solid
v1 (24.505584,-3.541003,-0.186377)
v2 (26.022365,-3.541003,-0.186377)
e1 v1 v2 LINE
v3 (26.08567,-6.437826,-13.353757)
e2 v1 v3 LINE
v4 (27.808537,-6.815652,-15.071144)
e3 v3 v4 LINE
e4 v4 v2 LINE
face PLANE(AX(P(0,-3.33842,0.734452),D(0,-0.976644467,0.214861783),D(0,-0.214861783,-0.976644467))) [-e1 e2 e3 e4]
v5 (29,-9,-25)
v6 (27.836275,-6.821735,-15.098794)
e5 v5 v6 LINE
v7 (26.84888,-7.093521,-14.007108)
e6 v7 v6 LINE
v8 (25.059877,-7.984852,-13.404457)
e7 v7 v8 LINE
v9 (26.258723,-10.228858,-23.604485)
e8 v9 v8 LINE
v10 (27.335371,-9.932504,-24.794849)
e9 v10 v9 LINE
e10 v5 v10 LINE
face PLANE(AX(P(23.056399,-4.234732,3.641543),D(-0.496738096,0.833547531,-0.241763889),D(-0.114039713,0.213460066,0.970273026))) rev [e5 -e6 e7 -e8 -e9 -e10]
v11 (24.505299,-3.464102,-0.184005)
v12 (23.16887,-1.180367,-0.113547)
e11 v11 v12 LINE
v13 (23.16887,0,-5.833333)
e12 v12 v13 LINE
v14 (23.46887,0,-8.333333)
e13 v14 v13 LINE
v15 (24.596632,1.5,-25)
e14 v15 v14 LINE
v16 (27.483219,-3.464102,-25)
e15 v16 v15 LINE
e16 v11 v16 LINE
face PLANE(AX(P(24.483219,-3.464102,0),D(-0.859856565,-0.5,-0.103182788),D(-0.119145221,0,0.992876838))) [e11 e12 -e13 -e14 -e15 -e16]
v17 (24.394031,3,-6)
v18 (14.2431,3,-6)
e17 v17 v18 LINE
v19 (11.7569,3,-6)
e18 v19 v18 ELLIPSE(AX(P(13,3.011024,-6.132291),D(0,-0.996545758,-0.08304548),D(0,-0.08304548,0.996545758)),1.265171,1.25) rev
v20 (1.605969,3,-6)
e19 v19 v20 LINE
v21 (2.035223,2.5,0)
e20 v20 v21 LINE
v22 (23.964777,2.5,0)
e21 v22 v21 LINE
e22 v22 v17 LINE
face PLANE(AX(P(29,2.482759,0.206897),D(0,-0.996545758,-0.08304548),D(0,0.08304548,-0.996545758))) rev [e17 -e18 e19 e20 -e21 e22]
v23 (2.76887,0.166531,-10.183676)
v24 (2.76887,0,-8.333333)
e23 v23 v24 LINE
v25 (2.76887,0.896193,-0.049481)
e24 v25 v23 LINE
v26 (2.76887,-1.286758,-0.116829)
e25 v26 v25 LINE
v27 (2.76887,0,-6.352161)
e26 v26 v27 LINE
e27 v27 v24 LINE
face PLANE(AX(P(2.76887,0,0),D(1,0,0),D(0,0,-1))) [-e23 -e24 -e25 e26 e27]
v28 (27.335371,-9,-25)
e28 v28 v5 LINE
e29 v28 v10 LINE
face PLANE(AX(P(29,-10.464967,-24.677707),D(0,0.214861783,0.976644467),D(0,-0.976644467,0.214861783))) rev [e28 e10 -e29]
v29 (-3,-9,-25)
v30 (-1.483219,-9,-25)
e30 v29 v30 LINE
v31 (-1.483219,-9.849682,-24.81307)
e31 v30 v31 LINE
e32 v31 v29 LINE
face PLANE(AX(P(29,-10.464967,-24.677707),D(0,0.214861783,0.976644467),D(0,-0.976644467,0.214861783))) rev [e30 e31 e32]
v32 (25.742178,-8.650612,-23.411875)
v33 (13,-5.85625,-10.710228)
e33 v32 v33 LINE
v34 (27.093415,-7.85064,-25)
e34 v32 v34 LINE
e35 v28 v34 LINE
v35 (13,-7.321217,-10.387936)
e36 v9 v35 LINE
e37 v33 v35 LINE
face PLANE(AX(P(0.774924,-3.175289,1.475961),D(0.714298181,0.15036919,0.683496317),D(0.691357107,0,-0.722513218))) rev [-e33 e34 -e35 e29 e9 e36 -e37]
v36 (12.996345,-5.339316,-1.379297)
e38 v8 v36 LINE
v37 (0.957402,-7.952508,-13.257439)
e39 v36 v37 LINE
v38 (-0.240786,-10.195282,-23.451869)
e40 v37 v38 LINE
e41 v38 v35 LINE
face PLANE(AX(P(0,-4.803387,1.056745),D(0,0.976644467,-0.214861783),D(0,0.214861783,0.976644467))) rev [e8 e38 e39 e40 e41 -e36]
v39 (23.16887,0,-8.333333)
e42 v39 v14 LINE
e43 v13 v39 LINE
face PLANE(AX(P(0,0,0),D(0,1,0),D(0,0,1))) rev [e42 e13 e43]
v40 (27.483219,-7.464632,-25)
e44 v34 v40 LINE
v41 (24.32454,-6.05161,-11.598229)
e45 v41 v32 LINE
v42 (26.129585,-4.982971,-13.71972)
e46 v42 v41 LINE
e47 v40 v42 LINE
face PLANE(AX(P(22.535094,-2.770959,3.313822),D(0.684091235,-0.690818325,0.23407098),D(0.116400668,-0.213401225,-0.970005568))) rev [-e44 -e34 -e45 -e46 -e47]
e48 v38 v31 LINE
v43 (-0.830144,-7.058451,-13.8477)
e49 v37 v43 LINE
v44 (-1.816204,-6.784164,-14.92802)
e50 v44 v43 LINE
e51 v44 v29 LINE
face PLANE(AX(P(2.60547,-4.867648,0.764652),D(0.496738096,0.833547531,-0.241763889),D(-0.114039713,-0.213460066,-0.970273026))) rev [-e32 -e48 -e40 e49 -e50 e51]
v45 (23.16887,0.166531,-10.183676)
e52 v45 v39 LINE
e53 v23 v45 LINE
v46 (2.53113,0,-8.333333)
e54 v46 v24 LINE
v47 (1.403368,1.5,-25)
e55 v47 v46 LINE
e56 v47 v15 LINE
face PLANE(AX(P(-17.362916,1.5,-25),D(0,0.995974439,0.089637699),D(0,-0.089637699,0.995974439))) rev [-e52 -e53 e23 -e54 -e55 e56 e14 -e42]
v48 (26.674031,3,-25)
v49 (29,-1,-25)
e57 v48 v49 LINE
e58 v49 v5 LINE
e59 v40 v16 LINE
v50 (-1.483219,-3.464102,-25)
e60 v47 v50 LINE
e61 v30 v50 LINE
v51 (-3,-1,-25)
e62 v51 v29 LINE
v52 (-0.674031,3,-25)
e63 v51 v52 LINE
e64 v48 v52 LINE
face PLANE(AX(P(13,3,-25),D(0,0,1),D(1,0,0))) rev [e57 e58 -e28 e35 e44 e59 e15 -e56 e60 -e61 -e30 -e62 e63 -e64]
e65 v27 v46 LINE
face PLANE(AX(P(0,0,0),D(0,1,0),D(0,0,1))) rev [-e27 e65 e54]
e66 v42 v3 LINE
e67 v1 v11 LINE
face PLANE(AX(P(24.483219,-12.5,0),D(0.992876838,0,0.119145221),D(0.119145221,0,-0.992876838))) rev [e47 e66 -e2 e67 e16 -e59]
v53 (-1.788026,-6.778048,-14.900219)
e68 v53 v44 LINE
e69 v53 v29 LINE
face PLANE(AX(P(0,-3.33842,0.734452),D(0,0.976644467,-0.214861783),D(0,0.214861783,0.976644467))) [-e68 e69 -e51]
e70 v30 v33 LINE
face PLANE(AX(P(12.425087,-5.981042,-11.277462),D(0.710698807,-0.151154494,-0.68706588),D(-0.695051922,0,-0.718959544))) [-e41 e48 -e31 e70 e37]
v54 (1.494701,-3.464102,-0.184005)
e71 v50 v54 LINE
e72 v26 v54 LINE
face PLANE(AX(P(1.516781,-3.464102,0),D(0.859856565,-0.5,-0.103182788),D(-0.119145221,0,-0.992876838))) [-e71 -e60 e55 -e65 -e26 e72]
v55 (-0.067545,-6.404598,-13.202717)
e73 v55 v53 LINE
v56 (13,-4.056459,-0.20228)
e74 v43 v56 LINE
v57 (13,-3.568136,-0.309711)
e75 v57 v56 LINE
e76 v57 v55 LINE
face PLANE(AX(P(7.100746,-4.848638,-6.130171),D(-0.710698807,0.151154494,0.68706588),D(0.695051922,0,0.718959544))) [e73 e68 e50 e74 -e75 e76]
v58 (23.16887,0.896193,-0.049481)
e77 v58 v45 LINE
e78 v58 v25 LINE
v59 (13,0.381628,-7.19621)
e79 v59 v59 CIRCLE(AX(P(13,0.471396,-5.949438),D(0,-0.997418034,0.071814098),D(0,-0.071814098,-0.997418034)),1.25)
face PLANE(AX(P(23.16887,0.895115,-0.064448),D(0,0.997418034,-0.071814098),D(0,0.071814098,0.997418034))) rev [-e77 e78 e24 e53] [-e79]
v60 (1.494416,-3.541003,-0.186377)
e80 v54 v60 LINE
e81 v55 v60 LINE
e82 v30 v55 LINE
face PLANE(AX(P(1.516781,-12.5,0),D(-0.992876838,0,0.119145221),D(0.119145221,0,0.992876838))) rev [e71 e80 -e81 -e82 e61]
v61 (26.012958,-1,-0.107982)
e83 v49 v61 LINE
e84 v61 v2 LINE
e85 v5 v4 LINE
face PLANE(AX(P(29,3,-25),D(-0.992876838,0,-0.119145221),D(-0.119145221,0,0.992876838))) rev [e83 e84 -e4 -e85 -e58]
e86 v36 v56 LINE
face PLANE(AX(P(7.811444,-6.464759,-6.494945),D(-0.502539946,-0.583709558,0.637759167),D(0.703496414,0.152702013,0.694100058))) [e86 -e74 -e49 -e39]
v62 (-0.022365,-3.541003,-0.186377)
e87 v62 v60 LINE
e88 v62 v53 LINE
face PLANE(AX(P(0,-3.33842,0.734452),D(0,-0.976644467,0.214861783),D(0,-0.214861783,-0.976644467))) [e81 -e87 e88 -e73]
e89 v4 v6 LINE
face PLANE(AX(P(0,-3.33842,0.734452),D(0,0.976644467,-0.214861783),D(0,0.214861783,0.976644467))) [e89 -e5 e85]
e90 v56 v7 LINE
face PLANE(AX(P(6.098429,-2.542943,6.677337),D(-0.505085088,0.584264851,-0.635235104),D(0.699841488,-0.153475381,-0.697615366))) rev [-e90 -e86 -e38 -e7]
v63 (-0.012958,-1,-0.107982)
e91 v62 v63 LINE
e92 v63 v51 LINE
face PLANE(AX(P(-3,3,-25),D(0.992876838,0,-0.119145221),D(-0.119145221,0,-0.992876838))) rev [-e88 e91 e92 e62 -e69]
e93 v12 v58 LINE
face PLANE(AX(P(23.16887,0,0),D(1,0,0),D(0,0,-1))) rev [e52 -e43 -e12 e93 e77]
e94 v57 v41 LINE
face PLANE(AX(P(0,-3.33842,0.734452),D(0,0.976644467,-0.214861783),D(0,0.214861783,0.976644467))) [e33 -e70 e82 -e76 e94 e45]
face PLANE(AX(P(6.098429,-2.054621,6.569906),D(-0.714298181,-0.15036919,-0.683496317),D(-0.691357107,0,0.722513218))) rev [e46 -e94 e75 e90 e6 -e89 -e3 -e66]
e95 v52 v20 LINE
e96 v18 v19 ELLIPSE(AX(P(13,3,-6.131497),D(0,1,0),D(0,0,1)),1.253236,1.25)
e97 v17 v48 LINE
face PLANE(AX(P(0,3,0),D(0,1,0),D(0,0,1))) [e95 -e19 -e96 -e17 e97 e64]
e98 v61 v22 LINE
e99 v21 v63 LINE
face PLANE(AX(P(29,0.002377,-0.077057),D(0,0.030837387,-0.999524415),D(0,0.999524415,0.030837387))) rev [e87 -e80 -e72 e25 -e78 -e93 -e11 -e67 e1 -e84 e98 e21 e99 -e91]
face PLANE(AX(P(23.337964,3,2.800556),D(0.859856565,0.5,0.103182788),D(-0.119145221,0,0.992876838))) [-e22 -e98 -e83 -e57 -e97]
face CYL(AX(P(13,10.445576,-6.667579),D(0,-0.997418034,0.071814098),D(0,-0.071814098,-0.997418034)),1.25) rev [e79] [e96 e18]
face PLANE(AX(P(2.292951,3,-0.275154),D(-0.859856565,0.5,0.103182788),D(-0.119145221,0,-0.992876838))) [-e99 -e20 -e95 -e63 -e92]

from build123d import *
from OCP.BRepFilletAPI import BRepFilletAPI_MakeChamfer

# Parameters (mm, degrees)
EXTRUDE_3_DEPTH                  = 3
EXTRUDE_4_DEPTH                  = 12.5
CHAMFER_3_SIZE                   = 2
CHAMFER_3_SIZE2                  = 3.464101615
CHAMFER_4_SIZE                   = 4
CHAMFER_4_SIZE2                  = 2.309401077
CUT_EXTRUDE_2_DEPTH              = 41.277164746
CUT_EXTRUDE_2_DEPTH_BACK         = 41.277164746
EXTRUDE_5_DEPTH                  = 1.5
CUT_EXTRUDE_5_DEPTH              = 1.5
CHAMFER_7_SIZE                   = 1.5
CHAMFER_7_SIZE_2                 = 1.539926414
CHAMFER_8_SIZE                   = 2.598076211
CHAMFER_8_SIZE_2                 = 1.5
CHAMFER_10_SIZE                  = 1
CUT_EXTRUDE_START                = 2.76887
CUT_EXTRUDE_13_DEPTH             = 20.4
SKETCH_16_R                      = 1.25
CUT_EXTRUDE_14_DEPTH             = 10
CUT_EXTRUDE_15_REACH             = 54.631
CUT_EXTRUDE_START_2              = 13
CUT_EXTRUDE_15_DIRECTION_2_REACH = 54.631
CUT_EXTRUDE_START_3              = -5
CUT_EXTRUDE_16_DEPTH             = 45.631175115


# Some blends are built 0.0001 mm under size
with BuildPart() as part:
    # Эскиз5 → Бобышка-Вытянуть3 (new body)
    with BuildSketch(Plane(origin=(0, 0, 0), x_dir=(1, 0, 0), z_dir=(0, 1, 0))):
        Polygon((0, 0), (26, 0), (29, 25), (13, 25), (-3, 25), align=None)
    extrude(amount=EXTRUDE_3_DEPTH)

    # Эскиз6 → Бобышка-Вытянуть4 (add)
    with BuildSketch(Plane(origin=(0, 0, 0), x_dir=(-1, 0, 0), z_dir=(0, -1, 0))):
        Polygon((0, 0), (3, 25), (1.483218869, 25), (-1.516781131, 0), align=None)
        Polygon((-27.483218869, 25), (-29, 25), (-26, 0), (-24.483218869, 0), align=None)
    extrude(amount=EXTRUDE_4_DEPTH)

    # Фаска3
    chamfer_3_edges = [part.edges().sort_by_distance(p)[0] for p in [
        (0.016781131, 0, -12.5),
        (25.983218869, 0, -12.5),
    ]]
    chamfer_3_side = [part.faces().sort_by_distance(p)[0] for p in [
        (13, 0, -12.981390637),
    ]]
    chamfer(chamfer_3_edges, length=CHAMFER_3_SIZE, length2=CHAMFER_3_SIZE2, reference=chamfer_3_side[0])

    # Фаска4: one chamfer whose edges measure the first distance from different faces: ONE call of the kernel's chamfer builder (chamfer() names one face for all edges)
    chamfer_4_edges_1 = [part.edges().sort_by_distance(p)[0] for p in [
        (27.5, 3, -12.5),
    ]]
    chamfer_4_side_1 = [part.faces().sort_by_distance(p)[0] for p in [
        (27.5, -4.75, -12.5),
    ]]
    chamfer_4_edges_2 = [part.edges().sort_by_distance(p)[0] for p in [
        (-1.5, 3, -12.5),
    ]]
    chamfer_4_side_2 = [part.faces().sort_by_distance(p)[0] for p in [
        (-1.5, -4.75, -12.5),
    ]]
    chamfer_4 = BRepFilletAPI_MakeChamfer(part.part.solid().wrapped)
    for e in chamfer_4_edges_1:
        chamfer_4.Add(CHAMFER_4_SIZE, CHAMFER_4_SIZE2, e.wrapped, chamfer_4_side_1[0].wrapped)  # the first distance lies on this face
    for e in chamfer_4_edges_2:
        chamfer_4.Add(CHAMFER_4_SIZE, CHAMFER_4_SIZE2, e.wrapped, chamfer_4_side_2[0].wrapped)  # the first distance lies on this face
    add(Compound.cast(chamfer_4.Shape()), mode=Mode.REPLACE)

    # Эскиз7 → Вырез-Вытянуть2 (cut, two sides: drawn at the far end of the back side and taken through both)
    with BuildSketch(Plane(origin=(0, 0, 0), x_dir=(0, 0, -1), z_dir=(1, 0, 0)).offset(-CUT_EXTRUDE_2_DEPTH_BACK)):
        Polygon((25, -14), (25, -9), (0, -3.5), (0, -11), (0, -14), align=None)
    extrude(amount=CUT_EXTRUDE_2_DEPTH + CUT_EXTRUDE_2_DEPTH_BACK, mode=Mode.SUBTRACT)

    # Эскиз8 → Бобышка-Вытянуть5 (add)
    with BuildSketch(Plane(origin=(0, -3.33842045, 0.734452499), x_dir=(-1, 0, 0), z_dir=(0, -0.97664446670509, 0.2148617826751198))):
        Polygon((-29, 26.349867712), (3, 26.349867712), (0, 0.214861783), (-26, 0.214861783), align=None)
    extrude(amount=EXTRUDE_5_DEPTH)

    # Эскиз12 → Вырез-Вытянуть5 (cut)
    with BuildSketch(Plane(origin=(0, -4.80338715, 1.056745173), x_dir=(-1, 0, 0), z_dir=(0, -0.9766444667050901, 0.21486178267511977))):
        Polygon((-27.335370868, 26.349867712), (-13, 11.718369714), (1.483218869, 26.349867712), align=None)
        Polygon((-26, 0.214861783), (-13, 0.214861783), (-13, 1.069133834), (-27.836275269, 16.211883463), (-27.726463854, 15.255242802), align=None)
        Polygon((-13, 1.069133834), (-13, 0.214861783), (0, 0.214861783), (1.726463854, 15.255242802), (1.81620359, 16.037025649), align=None)
    extrude(amount=-CUT_EXTRUDE_5_DEPTH, mode=Mode.SUBTRACT)

    # Фаска7
    # the kernel refuses this chamfer: 1.539926414, 1.5 mm, written as the material it adds along each edge
    with BuildSketch(Plane(origin=(25.624388162, -5.592143703, -9.509744106), x_dir=(0.053421240321816, 0.9765759265760705, -0.20843615500811763), z_dir=(0.11640066814175269, -0.21340122492654667, -0.9700055678479392))) as chamfer_7_piece_1_section:
        Polygon((CHAMFER_7_SIZE * 0.99960211638, -CHAMFER_7_SIZE * 0.0282065405255), (-CHAMFER_7_SIZE_2 * 0.0537868652542, -CHAMFER_7_SIZE_2 * 0.998552439015), (0, 0), align=None)
    chamfer_7_piece_1 = extrude(amount=19.932121115, mode=Mode.PRIVATE)
    chamfer_7_piece_1 = split(chamfer_7_piece_1, bisect_by=Plane(origin=(26.215798587, -7.11837448, -25), z_dir=(0, 0, 1)), keep=Keep.TOP, mode=Mode.PRIVATE)
    chamfer_7_piece_1 = split(chamfer_7_piece_1, bisect_by=Plane(origin=(28.863675649, -6.560961429, -16.229864216), z_dir=(-0.7142981809435934, -0.1503691897591953, -0.6834963170872516)), keep=Keep.TOP, mode=Mode.PRIVATE)
    chamfer_7_piece_1 = split(chamfer_7_piece_1, bisect_by=Plane(origin=(23.540170532, -7.681629481, -21.323809907), z_dir=(0.7142981809435934, 0.15036918975919533, 0.6834963170872517)), keep=Keep.TOP, mode=Mode.PRIVATE)
    add(chamfer_7_piece_1)

    # Фаска8
    chamfer_8_edges_1 = [part.edges().sort_by_distance(p)[0] for p in [
        (-2.408101795, -9.357048885, -19.641717258),
    ]]
    chamfer_8_side_1 = [part.faces().sort_by_distance(p)[0] for p in [
        (-2.378297509, -9.357783968, -19.645058546),
    ]]
    chamfer_8_edges_2 = [part.edges().sort_by_distance(p)[0] for p in [
        (28.418137634, -9.375834016, -19.727104216),
    ]]
    chamfer_8_side_2 = [part.faces().sort_by_distance(p)[0] for p in [
        (28.388333349, -9.376569099, -19.730445503),
    ]]
    chamfer_8 = BRepFilletAPI_MakeChamfer(part.part.solid().wrapped)
    for e in chamfer_8_edges_1:
        chamfer_8.Add(CHAMFER_8_SIZE - 0.0001, CHAMFER_8_SIZE_2 - 0.0001, e.wrapped, chamfer_8_side_1[0].wrapped)
    for e in chamfer_8_edges_2:
        chamfer_8.Add(CHAMFER_8_SIZE - 0.0001, CHAMFER_8_SIZE_2 - 0.0001, e.wrapped, chamfer_8_side_2[0].wrapped)
    add(Compound.cast(chamfer_8.Shape()), mode=Mode.REPLACE)  # a hair under: the kernel refuses the full size

    # Фаска10
    chamfer_10_edges = [part.edges().sort_by_distance(p)[0] for p in [
        (7.070930475, -6.320076094, -5.837295478),
        (18.937101702, -6.335110761, -5.905634875),
    ]]
    chamfer(chamfer_10_edges, length=CHAMFER_10_SIZE)

    # Эскиз15 → Вырез-Вытянуть13 (cut)
    with BuildSketch(Plane(origin=(0, 0, 0), x_dir=(0, 0, -1), z_dir=(1, 0, 0)).offset(CUT_EXTRUDE_START)):
        Polygon((-0.003394727, -2.1), (12.496605273, -2.1), (12.496605273, 0), (-0.003394727, 0.9), align=None)
    extrude(amount=CUT_EXTRUDE_13_DEPTH, mode=Mode.SUBTRACT)

    # Эскиз16 → Вырез-Вытянуть14 (cut)
    with BuildSketch(Plane(origin=(0, 0.891145714, -0.119581473), x_dir=(-1, 0, 0), z_dir=(0, -0.9974180343569141, 0.0718140984736978))):
        with Locations(Location((-13, 5.84494773, 0), (0, 0, 90))):
            Circle(SKETCH_16_R)
    extrude(amount=-CUT_EXTRUDE_14_DEPTH, mode=Mode.SUBTRACT)

    # Вырез-Вытянуть15: up to this plane
    cut_extrude_15_end = Plane(origin=(1.516781131, -3.464101615, 0), z_dir=(0.8598565649588564, -0.4999999999999951, -0.10318278779506272))
    # Эскиз17 → Вырез-Вытянуть15 (cut, up to the surface)
    with BuildSketch(Plane(origin=(0, 0, 0), x_dir=(0, 0, -1), z_dir=(1, 0, 0)).offset(CUT_EXTRUDE_START_2), mode=Mode.PRIVATE) as cut_extrude_15_sk1:
        Polygon((25, 1.5), (8.333333333, 0), (8.333333333, -2.621768853), (25, -2.621768853), align=None)
    cut_extrude_15_tool1 = split(extrude(cut_extrude_15_sk1.sketch, amount=-CUT_EXTRUDE_15_REACH, mode=Mode.PRIVATE), bisect_by=cut_extrude_15_end, keep=Keep.BOTH, mode=Mode.PRIVATE)
    add(cut_extrude_15_tool1.solids().sort_by_distance((13, -0.90808, -17.284542))[0], mode=Mode.SUBTRACT)

    # Вырез-Вытянуть15 direction 2: up to this plane
    cut_extrude_15_direction_2_end = Plane(origin=(24.483218869, -3.464101615, 0), z_dir=(-0.859856564958857, -0.49999999999999406, -0.10318278779506279))
    # Эскиз17 → Вырез-Вытянуть15 direction 2 (cut, up to the surface)
    with BuildSketch(Plane(origin=(0, 0, 0), x_dir=(0, 0, -1), z_dir=(1, 0, 0)).offset(CUT_EXTRUDE_START_2), mode=Mode.PRIVATE) as cut_extrude_15_direction_2_sk1:
        Polygon((25, 1.5), (8.333333333, 0), (8.333333333, -2.621768853), (25, -2.621768853), align=None)
    cut_extrude_15_direction_2_tool1 = split(extrude(cut_extrude_15_direction_2_sk1.sketch, amount=CUT_EXTRUDE_15_DIRECTION_2_REACH, mode=Mode.PRIVATE), bisect_by=cut_extrude_15_direction_2_end, keep=Keep.BOTH, mode=Mode.PRIVATE)
    add(cut_extrude_15_direction_2_tool1.solids().sort_by_distance((13, -0.90808, -17.284542))[0], mode=Mode.SUBTRACT)

    # Эскиз18 → Вырез-Вытянуть16 (cut, through all)
    with BuildSketch(Plane(origin=(0, 0, 0), x_dir=(0, 0, -1), z_dir=(1, 0, 0)).offset(CUT_EXTRUDE_START_3)):
        Polygon((6, 3), (0, 2.5), (0, 3), align=None)
        Polygon((0.202280253, -4.056458685), (0, 2.5), (0, -4.056458685), align=None)
    extrude(amount=CUT_EXTRUDE_16_DEPTH, mode=Mode.SUBTRACT)


solid = part.part
